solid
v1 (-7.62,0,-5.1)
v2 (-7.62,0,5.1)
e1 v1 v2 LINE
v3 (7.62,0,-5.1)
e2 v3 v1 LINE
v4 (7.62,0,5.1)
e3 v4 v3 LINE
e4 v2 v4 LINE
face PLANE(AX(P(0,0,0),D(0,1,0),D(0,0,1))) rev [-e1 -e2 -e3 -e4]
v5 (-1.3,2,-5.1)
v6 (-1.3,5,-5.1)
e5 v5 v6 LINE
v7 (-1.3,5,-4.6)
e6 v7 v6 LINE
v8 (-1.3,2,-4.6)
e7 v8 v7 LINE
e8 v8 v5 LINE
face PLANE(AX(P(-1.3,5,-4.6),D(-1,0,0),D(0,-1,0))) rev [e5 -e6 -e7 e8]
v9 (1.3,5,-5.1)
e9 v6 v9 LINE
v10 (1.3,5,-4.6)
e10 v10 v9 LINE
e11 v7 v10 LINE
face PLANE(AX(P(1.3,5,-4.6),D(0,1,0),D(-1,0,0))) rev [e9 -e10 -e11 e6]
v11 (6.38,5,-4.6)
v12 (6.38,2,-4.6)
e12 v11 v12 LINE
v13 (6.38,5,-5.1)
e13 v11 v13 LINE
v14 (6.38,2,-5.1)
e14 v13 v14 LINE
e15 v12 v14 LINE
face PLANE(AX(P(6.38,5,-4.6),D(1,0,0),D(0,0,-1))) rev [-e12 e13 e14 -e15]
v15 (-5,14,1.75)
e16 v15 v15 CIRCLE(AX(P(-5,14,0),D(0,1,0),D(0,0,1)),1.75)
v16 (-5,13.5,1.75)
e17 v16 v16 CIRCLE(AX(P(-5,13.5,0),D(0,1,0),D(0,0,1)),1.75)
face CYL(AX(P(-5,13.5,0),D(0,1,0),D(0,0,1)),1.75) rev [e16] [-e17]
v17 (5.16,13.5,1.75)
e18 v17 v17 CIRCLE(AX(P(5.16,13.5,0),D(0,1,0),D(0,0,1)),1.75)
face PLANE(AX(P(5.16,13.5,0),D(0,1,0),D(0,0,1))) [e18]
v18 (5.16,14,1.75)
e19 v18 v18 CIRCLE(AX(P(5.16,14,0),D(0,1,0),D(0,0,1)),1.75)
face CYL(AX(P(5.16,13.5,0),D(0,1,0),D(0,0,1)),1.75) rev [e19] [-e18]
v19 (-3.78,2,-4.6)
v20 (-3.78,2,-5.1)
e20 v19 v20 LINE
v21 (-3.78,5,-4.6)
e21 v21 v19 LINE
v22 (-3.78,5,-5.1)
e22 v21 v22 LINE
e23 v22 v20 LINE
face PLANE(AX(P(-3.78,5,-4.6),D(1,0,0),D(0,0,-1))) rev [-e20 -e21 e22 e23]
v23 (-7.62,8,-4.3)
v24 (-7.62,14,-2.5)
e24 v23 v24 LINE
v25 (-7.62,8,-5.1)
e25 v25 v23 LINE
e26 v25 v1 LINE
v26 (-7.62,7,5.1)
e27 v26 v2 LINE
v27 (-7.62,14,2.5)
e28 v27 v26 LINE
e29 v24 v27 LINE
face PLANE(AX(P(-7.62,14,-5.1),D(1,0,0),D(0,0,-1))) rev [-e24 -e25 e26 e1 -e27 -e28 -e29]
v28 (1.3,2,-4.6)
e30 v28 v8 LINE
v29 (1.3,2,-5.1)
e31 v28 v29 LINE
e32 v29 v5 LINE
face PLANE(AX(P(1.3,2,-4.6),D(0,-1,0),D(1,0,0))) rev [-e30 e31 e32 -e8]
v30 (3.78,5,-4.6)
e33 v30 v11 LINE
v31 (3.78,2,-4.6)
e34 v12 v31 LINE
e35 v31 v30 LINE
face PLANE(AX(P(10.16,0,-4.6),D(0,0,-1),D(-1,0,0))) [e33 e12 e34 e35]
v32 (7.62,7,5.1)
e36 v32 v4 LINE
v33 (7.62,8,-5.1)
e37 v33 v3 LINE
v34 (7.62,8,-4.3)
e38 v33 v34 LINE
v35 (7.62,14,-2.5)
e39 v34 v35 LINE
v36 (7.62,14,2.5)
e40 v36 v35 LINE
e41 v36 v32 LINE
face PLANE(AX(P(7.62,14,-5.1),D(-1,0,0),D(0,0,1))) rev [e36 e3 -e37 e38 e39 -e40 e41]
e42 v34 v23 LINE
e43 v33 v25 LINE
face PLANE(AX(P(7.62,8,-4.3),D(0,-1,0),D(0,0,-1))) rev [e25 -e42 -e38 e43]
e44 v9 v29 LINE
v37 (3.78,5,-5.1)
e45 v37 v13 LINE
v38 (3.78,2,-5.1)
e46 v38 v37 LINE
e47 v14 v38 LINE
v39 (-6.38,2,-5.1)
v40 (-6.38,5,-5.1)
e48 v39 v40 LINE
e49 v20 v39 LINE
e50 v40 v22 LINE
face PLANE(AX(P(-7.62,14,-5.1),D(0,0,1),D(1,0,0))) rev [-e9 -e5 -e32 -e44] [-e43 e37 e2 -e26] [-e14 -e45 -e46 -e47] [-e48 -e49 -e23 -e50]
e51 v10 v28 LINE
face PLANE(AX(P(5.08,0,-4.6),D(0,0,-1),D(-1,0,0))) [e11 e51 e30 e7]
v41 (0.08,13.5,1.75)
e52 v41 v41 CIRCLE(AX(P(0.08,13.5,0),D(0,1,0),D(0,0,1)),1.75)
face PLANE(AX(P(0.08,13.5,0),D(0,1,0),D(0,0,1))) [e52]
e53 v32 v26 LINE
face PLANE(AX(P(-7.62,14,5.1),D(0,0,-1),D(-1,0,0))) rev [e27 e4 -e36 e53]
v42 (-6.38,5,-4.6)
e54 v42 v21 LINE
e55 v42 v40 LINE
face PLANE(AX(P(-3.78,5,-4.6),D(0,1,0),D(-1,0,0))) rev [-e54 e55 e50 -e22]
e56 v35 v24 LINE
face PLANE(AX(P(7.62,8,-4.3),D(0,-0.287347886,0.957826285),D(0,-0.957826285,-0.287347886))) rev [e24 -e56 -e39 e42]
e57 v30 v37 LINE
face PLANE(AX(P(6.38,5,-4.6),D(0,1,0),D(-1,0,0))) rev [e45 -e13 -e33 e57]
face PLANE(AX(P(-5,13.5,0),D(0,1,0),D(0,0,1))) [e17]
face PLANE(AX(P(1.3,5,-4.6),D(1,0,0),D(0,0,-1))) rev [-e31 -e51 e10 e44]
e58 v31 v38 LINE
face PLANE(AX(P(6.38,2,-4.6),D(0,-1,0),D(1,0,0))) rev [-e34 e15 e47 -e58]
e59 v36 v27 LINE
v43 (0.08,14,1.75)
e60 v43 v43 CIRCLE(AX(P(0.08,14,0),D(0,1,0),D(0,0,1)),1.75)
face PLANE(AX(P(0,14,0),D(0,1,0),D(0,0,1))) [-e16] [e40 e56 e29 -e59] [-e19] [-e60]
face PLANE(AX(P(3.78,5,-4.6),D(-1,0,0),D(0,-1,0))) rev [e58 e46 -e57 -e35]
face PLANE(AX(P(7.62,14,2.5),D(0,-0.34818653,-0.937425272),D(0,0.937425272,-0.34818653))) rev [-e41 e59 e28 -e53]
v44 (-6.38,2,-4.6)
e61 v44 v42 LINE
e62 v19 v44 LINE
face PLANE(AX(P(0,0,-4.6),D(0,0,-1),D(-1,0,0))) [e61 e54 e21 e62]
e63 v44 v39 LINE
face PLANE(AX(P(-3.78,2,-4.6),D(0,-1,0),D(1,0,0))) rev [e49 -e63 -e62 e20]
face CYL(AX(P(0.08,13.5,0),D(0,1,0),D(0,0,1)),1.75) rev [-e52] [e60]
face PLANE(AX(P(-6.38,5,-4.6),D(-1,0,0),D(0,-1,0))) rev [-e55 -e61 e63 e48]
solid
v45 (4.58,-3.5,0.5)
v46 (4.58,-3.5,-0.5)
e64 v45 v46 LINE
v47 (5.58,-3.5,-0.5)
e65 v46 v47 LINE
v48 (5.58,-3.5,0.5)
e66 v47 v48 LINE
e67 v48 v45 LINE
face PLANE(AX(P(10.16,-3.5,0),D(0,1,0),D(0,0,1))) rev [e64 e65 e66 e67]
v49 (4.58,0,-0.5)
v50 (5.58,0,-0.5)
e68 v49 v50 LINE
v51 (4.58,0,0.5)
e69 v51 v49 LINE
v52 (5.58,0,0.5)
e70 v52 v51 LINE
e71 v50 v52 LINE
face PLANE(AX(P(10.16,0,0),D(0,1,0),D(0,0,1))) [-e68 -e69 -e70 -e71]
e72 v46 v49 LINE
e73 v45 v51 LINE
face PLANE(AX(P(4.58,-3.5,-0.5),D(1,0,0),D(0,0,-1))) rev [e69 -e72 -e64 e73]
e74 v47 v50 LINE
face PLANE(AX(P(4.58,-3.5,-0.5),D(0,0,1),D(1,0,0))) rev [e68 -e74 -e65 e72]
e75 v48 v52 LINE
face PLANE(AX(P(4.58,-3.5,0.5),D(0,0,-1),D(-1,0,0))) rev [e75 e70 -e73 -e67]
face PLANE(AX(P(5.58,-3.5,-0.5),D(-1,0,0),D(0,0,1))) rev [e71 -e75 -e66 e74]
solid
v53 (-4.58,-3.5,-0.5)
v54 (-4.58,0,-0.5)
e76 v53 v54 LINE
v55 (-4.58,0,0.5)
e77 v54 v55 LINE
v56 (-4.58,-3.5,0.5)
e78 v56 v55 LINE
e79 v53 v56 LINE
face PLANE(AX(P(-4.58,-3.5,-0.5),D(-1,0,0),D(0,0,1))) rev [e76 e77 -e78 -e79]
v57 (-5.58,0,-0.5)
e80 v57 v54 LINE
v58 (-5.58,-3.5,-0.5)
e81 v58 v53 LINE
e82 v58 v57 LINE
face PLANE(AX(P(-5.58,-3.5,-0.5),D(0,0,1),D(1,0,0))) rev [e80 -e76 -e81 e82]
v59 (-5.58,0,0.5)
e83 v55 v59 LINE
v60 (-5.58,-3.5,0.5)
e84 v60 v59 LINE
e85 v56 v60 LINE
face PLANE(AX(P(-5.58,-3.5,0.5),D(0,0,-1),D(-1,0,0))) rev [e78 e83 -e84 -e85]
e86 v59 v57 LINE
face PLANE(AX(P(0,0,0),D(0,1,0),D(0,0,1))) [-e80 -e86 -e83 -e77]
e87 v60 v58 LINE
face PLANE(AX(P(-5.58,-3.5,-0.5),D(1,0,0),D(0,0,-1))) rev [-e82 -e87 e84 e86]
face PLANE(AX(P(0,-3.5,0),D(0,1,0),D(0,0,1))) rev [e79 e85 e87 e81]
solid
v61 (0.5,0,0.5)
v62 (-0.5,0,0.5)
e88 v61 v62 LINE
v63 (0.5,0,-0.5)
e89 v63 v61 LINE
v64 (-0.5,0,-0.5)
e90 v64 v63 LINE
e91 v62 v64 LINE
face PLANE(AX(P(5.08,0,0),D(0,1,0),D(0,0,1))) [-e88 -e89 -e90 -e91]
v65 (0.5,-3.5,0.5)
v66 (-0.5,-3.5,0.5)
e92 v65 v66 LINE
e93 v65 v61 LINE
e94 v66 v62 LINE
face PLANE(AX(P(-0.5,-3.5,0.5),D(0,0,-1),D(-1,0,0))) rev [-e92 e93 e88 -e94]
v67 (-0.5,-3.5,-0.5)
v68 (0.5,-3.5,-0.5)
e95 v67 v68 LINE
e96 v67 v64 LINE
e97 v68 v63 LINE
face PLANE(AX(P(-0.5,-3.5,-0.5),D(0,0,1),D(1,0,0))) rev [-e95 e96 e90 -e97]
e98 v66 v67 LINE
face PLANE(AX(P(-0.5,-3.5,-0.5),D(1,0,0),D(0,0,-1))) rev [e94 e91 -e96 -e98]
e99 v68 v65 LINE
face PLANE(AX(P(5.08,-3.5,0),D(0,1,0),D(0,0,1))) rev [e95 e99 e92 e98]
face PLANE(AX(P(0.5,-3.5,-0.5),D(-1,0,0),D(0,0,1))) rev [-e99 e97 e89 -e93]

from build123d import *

# Parameters (mm, degrees)
SKETCH3_W             = 15.24
SKETCH3_H             = 10.2
BOSS_EXTRUDE3_DEPTH   = 14
CUT_EXTRUDE1_DEPTH    = 22.313554373
SKETCH5_R             = 1.75
CUT_EXTRUDE2_DEPTH    = 0.5
SKETCH6_W             = 2.6
SKETCH6_H             = 3
CUT_EXTRUDE4_DEPTH    = 0.5
SKETCH7_W             = 1
SKETCH7_H             = 1
BOSS_EXTRUDE4_DEPTH   = 3.5
LPATTERN2_START       = 4.58
LPATTERN2_OUTLINE_W   = 3.5
LPATTERN2_OUTLINE_H   = 1
LPATTERN2_DEPTH       = 1
LPATTERN2_START_2     = -0.5
LPATTERN2_2_OUTLINE_W = 3.5
LPATTERN2_2_OUTLINE_H = 1
LPATTERN2_2_DEPTH     = 1
LPATTERN2_START_3     = 13.5
LPATTERN2_3_OUTLINE_R = 1.75
LPATTERN2_3_DEPTH     = 0.5
LPATTERN2_START_4     = 2
LPATTERN2_4_OUTLINE_W = 2.6
LPATTERN2_4_OUTLINE_H = 0.5
LPATTERN2_4_DEPTH     = 3


# Read off the part's stored shape, not the designer's step: LPattern2
with BuildPart() as part:
    # Sketch3 → Boss-Extrude3 (new body)
    with BuildSketch(Plane(origin=(0, 0, 0), x_dir=(1, 0, 0), z_dir=(0, 1, 0))):
        Rectangle(SKETCH3_W, SKETCH3_H)
    extrude(amount=BOSS_EXTRUDE3_DEPTH)

    # Sketch4 → Cut-Extrude1 (cut, through all)
    with BuildSketch(Plane.ZY.offset(7.62)):
        Polygon((-4.3, 8), (-2.5, 14), (-4.3, 14), (-5.1, 14), (-5.1, 8), align=None)
        Polygon((5.1, 14), (2.5, 14), (5.1, 7), align=None)
    extrude(amount=-CUT_EXTRUDE1_DEPTH, mode=Mode.SUBTRACT)

    # Sketch5 → Cut-Extrude2 (cut)
    with BuildSketch(Plane(origin=(0, 14, 0), x_dir=(1, 0, 0), z_dir=(0, 1, 0))):
        with Locations(Location((-5, 0, 0), (0, 0, 270))):
            Circle(SKETCH5_R)
    extrude(amount=-CUT_EXTRUDE2_DEPTH, mode=Mode.SUBTRACT)

    # Sketch6 → Cut-Extrude4 (cut)
    with BuildSketch(Plane(origin=(0, 0, -5.1), x_dir=(-1, 0, 0), z_dir=(0, 0, -1))):
        with Locations((5.08, 3.5)):
            Rectangle(SKETCH6_W, SKETCH6_H)
    extrude(amount=-CUT_EXTRUDE4_DEPTH, mode=Mode.SUBTRACT)

    # LPattern2 3 outline → LPattern2 3 (cut)
    with BuildSketch(Plane(origin=(0, 0, 0), x_dir=(1, 0, 0), z_dir=(0, 1, 0)).offset(LPATTERN2_START_3)):
        with Locations((5.16, 0)):
            Circle(LPATTERN2_3_OUTLINE_R)
        with Locations((0.08, 0)):
            Circle(LPATTERN2_3_OUTLINE_R)
    extrude(amount=LPATTERN2_3_DEPTH, mode=Mode.SUBTRACT)

    # LPattern2 4 outline → LPattern2 4 (cut)
    with BuildSketch(Plane(origin=(0, 0, 0), x_dir=(1, 0, 0), z_dir=(0, 1, 0)).offset(LPATTERN2_START_4)):
        with Locations((0, 4.85)):
            Rectangle(LPATTERN2_4_OUTLINE_W, LPATTERN2_4_OUTLINE_H)
        with Locations((5.08, 4.85)):
            Rectangle(LPATTERN2_4_OUTLINE_W, LPATTERN2_4_OUTLINE_H)
    extrude(amount=LPATTERN2_4_DEPTH, mode=Mode.SUBTRACT)


with BuildPart() as body_2:
    # Sketch7 → Boss-Extrude4 (new body)
    with BuildSketch(Plane.XZ):
        with Locations((-5.08, 0)):
            Rectangle(SKETCH7_W, SKETCH7_H)
    extrude(amount=BOSS_EXTRUDE4_DEPTH)


with BuildPart() as body_3:
    # LPattern2 outline → LPattern2 (new body)
    with BuildSketch(Plane.YZ.offset(LPATTERN2_START)):
        with Locations((-1.75, 0)):
            Rectangle(LPATTERN2_OUTLINE_W, LPATTERN2_OUTLINE_H)
    extrude(amount=LPATTERN2_DEPTH)


with BuildPart() as body_4:
    # LPattern2 2 outline → LPattern2 2 (new body)
    with BuildSketch(Plane.YZ.offset(LPATTERN2_START_2)):
        with Locations((-1.75, 0)):
            Rectangle(LPATTERN2_2_OUTLINE_W, LPATTERN2_2_OUTLINE_H)
    extrude(amount=LPATTERN2_2_DEPTH)


solid = Compound([part.part, body_2.part, body_3.part, body_4.part])
